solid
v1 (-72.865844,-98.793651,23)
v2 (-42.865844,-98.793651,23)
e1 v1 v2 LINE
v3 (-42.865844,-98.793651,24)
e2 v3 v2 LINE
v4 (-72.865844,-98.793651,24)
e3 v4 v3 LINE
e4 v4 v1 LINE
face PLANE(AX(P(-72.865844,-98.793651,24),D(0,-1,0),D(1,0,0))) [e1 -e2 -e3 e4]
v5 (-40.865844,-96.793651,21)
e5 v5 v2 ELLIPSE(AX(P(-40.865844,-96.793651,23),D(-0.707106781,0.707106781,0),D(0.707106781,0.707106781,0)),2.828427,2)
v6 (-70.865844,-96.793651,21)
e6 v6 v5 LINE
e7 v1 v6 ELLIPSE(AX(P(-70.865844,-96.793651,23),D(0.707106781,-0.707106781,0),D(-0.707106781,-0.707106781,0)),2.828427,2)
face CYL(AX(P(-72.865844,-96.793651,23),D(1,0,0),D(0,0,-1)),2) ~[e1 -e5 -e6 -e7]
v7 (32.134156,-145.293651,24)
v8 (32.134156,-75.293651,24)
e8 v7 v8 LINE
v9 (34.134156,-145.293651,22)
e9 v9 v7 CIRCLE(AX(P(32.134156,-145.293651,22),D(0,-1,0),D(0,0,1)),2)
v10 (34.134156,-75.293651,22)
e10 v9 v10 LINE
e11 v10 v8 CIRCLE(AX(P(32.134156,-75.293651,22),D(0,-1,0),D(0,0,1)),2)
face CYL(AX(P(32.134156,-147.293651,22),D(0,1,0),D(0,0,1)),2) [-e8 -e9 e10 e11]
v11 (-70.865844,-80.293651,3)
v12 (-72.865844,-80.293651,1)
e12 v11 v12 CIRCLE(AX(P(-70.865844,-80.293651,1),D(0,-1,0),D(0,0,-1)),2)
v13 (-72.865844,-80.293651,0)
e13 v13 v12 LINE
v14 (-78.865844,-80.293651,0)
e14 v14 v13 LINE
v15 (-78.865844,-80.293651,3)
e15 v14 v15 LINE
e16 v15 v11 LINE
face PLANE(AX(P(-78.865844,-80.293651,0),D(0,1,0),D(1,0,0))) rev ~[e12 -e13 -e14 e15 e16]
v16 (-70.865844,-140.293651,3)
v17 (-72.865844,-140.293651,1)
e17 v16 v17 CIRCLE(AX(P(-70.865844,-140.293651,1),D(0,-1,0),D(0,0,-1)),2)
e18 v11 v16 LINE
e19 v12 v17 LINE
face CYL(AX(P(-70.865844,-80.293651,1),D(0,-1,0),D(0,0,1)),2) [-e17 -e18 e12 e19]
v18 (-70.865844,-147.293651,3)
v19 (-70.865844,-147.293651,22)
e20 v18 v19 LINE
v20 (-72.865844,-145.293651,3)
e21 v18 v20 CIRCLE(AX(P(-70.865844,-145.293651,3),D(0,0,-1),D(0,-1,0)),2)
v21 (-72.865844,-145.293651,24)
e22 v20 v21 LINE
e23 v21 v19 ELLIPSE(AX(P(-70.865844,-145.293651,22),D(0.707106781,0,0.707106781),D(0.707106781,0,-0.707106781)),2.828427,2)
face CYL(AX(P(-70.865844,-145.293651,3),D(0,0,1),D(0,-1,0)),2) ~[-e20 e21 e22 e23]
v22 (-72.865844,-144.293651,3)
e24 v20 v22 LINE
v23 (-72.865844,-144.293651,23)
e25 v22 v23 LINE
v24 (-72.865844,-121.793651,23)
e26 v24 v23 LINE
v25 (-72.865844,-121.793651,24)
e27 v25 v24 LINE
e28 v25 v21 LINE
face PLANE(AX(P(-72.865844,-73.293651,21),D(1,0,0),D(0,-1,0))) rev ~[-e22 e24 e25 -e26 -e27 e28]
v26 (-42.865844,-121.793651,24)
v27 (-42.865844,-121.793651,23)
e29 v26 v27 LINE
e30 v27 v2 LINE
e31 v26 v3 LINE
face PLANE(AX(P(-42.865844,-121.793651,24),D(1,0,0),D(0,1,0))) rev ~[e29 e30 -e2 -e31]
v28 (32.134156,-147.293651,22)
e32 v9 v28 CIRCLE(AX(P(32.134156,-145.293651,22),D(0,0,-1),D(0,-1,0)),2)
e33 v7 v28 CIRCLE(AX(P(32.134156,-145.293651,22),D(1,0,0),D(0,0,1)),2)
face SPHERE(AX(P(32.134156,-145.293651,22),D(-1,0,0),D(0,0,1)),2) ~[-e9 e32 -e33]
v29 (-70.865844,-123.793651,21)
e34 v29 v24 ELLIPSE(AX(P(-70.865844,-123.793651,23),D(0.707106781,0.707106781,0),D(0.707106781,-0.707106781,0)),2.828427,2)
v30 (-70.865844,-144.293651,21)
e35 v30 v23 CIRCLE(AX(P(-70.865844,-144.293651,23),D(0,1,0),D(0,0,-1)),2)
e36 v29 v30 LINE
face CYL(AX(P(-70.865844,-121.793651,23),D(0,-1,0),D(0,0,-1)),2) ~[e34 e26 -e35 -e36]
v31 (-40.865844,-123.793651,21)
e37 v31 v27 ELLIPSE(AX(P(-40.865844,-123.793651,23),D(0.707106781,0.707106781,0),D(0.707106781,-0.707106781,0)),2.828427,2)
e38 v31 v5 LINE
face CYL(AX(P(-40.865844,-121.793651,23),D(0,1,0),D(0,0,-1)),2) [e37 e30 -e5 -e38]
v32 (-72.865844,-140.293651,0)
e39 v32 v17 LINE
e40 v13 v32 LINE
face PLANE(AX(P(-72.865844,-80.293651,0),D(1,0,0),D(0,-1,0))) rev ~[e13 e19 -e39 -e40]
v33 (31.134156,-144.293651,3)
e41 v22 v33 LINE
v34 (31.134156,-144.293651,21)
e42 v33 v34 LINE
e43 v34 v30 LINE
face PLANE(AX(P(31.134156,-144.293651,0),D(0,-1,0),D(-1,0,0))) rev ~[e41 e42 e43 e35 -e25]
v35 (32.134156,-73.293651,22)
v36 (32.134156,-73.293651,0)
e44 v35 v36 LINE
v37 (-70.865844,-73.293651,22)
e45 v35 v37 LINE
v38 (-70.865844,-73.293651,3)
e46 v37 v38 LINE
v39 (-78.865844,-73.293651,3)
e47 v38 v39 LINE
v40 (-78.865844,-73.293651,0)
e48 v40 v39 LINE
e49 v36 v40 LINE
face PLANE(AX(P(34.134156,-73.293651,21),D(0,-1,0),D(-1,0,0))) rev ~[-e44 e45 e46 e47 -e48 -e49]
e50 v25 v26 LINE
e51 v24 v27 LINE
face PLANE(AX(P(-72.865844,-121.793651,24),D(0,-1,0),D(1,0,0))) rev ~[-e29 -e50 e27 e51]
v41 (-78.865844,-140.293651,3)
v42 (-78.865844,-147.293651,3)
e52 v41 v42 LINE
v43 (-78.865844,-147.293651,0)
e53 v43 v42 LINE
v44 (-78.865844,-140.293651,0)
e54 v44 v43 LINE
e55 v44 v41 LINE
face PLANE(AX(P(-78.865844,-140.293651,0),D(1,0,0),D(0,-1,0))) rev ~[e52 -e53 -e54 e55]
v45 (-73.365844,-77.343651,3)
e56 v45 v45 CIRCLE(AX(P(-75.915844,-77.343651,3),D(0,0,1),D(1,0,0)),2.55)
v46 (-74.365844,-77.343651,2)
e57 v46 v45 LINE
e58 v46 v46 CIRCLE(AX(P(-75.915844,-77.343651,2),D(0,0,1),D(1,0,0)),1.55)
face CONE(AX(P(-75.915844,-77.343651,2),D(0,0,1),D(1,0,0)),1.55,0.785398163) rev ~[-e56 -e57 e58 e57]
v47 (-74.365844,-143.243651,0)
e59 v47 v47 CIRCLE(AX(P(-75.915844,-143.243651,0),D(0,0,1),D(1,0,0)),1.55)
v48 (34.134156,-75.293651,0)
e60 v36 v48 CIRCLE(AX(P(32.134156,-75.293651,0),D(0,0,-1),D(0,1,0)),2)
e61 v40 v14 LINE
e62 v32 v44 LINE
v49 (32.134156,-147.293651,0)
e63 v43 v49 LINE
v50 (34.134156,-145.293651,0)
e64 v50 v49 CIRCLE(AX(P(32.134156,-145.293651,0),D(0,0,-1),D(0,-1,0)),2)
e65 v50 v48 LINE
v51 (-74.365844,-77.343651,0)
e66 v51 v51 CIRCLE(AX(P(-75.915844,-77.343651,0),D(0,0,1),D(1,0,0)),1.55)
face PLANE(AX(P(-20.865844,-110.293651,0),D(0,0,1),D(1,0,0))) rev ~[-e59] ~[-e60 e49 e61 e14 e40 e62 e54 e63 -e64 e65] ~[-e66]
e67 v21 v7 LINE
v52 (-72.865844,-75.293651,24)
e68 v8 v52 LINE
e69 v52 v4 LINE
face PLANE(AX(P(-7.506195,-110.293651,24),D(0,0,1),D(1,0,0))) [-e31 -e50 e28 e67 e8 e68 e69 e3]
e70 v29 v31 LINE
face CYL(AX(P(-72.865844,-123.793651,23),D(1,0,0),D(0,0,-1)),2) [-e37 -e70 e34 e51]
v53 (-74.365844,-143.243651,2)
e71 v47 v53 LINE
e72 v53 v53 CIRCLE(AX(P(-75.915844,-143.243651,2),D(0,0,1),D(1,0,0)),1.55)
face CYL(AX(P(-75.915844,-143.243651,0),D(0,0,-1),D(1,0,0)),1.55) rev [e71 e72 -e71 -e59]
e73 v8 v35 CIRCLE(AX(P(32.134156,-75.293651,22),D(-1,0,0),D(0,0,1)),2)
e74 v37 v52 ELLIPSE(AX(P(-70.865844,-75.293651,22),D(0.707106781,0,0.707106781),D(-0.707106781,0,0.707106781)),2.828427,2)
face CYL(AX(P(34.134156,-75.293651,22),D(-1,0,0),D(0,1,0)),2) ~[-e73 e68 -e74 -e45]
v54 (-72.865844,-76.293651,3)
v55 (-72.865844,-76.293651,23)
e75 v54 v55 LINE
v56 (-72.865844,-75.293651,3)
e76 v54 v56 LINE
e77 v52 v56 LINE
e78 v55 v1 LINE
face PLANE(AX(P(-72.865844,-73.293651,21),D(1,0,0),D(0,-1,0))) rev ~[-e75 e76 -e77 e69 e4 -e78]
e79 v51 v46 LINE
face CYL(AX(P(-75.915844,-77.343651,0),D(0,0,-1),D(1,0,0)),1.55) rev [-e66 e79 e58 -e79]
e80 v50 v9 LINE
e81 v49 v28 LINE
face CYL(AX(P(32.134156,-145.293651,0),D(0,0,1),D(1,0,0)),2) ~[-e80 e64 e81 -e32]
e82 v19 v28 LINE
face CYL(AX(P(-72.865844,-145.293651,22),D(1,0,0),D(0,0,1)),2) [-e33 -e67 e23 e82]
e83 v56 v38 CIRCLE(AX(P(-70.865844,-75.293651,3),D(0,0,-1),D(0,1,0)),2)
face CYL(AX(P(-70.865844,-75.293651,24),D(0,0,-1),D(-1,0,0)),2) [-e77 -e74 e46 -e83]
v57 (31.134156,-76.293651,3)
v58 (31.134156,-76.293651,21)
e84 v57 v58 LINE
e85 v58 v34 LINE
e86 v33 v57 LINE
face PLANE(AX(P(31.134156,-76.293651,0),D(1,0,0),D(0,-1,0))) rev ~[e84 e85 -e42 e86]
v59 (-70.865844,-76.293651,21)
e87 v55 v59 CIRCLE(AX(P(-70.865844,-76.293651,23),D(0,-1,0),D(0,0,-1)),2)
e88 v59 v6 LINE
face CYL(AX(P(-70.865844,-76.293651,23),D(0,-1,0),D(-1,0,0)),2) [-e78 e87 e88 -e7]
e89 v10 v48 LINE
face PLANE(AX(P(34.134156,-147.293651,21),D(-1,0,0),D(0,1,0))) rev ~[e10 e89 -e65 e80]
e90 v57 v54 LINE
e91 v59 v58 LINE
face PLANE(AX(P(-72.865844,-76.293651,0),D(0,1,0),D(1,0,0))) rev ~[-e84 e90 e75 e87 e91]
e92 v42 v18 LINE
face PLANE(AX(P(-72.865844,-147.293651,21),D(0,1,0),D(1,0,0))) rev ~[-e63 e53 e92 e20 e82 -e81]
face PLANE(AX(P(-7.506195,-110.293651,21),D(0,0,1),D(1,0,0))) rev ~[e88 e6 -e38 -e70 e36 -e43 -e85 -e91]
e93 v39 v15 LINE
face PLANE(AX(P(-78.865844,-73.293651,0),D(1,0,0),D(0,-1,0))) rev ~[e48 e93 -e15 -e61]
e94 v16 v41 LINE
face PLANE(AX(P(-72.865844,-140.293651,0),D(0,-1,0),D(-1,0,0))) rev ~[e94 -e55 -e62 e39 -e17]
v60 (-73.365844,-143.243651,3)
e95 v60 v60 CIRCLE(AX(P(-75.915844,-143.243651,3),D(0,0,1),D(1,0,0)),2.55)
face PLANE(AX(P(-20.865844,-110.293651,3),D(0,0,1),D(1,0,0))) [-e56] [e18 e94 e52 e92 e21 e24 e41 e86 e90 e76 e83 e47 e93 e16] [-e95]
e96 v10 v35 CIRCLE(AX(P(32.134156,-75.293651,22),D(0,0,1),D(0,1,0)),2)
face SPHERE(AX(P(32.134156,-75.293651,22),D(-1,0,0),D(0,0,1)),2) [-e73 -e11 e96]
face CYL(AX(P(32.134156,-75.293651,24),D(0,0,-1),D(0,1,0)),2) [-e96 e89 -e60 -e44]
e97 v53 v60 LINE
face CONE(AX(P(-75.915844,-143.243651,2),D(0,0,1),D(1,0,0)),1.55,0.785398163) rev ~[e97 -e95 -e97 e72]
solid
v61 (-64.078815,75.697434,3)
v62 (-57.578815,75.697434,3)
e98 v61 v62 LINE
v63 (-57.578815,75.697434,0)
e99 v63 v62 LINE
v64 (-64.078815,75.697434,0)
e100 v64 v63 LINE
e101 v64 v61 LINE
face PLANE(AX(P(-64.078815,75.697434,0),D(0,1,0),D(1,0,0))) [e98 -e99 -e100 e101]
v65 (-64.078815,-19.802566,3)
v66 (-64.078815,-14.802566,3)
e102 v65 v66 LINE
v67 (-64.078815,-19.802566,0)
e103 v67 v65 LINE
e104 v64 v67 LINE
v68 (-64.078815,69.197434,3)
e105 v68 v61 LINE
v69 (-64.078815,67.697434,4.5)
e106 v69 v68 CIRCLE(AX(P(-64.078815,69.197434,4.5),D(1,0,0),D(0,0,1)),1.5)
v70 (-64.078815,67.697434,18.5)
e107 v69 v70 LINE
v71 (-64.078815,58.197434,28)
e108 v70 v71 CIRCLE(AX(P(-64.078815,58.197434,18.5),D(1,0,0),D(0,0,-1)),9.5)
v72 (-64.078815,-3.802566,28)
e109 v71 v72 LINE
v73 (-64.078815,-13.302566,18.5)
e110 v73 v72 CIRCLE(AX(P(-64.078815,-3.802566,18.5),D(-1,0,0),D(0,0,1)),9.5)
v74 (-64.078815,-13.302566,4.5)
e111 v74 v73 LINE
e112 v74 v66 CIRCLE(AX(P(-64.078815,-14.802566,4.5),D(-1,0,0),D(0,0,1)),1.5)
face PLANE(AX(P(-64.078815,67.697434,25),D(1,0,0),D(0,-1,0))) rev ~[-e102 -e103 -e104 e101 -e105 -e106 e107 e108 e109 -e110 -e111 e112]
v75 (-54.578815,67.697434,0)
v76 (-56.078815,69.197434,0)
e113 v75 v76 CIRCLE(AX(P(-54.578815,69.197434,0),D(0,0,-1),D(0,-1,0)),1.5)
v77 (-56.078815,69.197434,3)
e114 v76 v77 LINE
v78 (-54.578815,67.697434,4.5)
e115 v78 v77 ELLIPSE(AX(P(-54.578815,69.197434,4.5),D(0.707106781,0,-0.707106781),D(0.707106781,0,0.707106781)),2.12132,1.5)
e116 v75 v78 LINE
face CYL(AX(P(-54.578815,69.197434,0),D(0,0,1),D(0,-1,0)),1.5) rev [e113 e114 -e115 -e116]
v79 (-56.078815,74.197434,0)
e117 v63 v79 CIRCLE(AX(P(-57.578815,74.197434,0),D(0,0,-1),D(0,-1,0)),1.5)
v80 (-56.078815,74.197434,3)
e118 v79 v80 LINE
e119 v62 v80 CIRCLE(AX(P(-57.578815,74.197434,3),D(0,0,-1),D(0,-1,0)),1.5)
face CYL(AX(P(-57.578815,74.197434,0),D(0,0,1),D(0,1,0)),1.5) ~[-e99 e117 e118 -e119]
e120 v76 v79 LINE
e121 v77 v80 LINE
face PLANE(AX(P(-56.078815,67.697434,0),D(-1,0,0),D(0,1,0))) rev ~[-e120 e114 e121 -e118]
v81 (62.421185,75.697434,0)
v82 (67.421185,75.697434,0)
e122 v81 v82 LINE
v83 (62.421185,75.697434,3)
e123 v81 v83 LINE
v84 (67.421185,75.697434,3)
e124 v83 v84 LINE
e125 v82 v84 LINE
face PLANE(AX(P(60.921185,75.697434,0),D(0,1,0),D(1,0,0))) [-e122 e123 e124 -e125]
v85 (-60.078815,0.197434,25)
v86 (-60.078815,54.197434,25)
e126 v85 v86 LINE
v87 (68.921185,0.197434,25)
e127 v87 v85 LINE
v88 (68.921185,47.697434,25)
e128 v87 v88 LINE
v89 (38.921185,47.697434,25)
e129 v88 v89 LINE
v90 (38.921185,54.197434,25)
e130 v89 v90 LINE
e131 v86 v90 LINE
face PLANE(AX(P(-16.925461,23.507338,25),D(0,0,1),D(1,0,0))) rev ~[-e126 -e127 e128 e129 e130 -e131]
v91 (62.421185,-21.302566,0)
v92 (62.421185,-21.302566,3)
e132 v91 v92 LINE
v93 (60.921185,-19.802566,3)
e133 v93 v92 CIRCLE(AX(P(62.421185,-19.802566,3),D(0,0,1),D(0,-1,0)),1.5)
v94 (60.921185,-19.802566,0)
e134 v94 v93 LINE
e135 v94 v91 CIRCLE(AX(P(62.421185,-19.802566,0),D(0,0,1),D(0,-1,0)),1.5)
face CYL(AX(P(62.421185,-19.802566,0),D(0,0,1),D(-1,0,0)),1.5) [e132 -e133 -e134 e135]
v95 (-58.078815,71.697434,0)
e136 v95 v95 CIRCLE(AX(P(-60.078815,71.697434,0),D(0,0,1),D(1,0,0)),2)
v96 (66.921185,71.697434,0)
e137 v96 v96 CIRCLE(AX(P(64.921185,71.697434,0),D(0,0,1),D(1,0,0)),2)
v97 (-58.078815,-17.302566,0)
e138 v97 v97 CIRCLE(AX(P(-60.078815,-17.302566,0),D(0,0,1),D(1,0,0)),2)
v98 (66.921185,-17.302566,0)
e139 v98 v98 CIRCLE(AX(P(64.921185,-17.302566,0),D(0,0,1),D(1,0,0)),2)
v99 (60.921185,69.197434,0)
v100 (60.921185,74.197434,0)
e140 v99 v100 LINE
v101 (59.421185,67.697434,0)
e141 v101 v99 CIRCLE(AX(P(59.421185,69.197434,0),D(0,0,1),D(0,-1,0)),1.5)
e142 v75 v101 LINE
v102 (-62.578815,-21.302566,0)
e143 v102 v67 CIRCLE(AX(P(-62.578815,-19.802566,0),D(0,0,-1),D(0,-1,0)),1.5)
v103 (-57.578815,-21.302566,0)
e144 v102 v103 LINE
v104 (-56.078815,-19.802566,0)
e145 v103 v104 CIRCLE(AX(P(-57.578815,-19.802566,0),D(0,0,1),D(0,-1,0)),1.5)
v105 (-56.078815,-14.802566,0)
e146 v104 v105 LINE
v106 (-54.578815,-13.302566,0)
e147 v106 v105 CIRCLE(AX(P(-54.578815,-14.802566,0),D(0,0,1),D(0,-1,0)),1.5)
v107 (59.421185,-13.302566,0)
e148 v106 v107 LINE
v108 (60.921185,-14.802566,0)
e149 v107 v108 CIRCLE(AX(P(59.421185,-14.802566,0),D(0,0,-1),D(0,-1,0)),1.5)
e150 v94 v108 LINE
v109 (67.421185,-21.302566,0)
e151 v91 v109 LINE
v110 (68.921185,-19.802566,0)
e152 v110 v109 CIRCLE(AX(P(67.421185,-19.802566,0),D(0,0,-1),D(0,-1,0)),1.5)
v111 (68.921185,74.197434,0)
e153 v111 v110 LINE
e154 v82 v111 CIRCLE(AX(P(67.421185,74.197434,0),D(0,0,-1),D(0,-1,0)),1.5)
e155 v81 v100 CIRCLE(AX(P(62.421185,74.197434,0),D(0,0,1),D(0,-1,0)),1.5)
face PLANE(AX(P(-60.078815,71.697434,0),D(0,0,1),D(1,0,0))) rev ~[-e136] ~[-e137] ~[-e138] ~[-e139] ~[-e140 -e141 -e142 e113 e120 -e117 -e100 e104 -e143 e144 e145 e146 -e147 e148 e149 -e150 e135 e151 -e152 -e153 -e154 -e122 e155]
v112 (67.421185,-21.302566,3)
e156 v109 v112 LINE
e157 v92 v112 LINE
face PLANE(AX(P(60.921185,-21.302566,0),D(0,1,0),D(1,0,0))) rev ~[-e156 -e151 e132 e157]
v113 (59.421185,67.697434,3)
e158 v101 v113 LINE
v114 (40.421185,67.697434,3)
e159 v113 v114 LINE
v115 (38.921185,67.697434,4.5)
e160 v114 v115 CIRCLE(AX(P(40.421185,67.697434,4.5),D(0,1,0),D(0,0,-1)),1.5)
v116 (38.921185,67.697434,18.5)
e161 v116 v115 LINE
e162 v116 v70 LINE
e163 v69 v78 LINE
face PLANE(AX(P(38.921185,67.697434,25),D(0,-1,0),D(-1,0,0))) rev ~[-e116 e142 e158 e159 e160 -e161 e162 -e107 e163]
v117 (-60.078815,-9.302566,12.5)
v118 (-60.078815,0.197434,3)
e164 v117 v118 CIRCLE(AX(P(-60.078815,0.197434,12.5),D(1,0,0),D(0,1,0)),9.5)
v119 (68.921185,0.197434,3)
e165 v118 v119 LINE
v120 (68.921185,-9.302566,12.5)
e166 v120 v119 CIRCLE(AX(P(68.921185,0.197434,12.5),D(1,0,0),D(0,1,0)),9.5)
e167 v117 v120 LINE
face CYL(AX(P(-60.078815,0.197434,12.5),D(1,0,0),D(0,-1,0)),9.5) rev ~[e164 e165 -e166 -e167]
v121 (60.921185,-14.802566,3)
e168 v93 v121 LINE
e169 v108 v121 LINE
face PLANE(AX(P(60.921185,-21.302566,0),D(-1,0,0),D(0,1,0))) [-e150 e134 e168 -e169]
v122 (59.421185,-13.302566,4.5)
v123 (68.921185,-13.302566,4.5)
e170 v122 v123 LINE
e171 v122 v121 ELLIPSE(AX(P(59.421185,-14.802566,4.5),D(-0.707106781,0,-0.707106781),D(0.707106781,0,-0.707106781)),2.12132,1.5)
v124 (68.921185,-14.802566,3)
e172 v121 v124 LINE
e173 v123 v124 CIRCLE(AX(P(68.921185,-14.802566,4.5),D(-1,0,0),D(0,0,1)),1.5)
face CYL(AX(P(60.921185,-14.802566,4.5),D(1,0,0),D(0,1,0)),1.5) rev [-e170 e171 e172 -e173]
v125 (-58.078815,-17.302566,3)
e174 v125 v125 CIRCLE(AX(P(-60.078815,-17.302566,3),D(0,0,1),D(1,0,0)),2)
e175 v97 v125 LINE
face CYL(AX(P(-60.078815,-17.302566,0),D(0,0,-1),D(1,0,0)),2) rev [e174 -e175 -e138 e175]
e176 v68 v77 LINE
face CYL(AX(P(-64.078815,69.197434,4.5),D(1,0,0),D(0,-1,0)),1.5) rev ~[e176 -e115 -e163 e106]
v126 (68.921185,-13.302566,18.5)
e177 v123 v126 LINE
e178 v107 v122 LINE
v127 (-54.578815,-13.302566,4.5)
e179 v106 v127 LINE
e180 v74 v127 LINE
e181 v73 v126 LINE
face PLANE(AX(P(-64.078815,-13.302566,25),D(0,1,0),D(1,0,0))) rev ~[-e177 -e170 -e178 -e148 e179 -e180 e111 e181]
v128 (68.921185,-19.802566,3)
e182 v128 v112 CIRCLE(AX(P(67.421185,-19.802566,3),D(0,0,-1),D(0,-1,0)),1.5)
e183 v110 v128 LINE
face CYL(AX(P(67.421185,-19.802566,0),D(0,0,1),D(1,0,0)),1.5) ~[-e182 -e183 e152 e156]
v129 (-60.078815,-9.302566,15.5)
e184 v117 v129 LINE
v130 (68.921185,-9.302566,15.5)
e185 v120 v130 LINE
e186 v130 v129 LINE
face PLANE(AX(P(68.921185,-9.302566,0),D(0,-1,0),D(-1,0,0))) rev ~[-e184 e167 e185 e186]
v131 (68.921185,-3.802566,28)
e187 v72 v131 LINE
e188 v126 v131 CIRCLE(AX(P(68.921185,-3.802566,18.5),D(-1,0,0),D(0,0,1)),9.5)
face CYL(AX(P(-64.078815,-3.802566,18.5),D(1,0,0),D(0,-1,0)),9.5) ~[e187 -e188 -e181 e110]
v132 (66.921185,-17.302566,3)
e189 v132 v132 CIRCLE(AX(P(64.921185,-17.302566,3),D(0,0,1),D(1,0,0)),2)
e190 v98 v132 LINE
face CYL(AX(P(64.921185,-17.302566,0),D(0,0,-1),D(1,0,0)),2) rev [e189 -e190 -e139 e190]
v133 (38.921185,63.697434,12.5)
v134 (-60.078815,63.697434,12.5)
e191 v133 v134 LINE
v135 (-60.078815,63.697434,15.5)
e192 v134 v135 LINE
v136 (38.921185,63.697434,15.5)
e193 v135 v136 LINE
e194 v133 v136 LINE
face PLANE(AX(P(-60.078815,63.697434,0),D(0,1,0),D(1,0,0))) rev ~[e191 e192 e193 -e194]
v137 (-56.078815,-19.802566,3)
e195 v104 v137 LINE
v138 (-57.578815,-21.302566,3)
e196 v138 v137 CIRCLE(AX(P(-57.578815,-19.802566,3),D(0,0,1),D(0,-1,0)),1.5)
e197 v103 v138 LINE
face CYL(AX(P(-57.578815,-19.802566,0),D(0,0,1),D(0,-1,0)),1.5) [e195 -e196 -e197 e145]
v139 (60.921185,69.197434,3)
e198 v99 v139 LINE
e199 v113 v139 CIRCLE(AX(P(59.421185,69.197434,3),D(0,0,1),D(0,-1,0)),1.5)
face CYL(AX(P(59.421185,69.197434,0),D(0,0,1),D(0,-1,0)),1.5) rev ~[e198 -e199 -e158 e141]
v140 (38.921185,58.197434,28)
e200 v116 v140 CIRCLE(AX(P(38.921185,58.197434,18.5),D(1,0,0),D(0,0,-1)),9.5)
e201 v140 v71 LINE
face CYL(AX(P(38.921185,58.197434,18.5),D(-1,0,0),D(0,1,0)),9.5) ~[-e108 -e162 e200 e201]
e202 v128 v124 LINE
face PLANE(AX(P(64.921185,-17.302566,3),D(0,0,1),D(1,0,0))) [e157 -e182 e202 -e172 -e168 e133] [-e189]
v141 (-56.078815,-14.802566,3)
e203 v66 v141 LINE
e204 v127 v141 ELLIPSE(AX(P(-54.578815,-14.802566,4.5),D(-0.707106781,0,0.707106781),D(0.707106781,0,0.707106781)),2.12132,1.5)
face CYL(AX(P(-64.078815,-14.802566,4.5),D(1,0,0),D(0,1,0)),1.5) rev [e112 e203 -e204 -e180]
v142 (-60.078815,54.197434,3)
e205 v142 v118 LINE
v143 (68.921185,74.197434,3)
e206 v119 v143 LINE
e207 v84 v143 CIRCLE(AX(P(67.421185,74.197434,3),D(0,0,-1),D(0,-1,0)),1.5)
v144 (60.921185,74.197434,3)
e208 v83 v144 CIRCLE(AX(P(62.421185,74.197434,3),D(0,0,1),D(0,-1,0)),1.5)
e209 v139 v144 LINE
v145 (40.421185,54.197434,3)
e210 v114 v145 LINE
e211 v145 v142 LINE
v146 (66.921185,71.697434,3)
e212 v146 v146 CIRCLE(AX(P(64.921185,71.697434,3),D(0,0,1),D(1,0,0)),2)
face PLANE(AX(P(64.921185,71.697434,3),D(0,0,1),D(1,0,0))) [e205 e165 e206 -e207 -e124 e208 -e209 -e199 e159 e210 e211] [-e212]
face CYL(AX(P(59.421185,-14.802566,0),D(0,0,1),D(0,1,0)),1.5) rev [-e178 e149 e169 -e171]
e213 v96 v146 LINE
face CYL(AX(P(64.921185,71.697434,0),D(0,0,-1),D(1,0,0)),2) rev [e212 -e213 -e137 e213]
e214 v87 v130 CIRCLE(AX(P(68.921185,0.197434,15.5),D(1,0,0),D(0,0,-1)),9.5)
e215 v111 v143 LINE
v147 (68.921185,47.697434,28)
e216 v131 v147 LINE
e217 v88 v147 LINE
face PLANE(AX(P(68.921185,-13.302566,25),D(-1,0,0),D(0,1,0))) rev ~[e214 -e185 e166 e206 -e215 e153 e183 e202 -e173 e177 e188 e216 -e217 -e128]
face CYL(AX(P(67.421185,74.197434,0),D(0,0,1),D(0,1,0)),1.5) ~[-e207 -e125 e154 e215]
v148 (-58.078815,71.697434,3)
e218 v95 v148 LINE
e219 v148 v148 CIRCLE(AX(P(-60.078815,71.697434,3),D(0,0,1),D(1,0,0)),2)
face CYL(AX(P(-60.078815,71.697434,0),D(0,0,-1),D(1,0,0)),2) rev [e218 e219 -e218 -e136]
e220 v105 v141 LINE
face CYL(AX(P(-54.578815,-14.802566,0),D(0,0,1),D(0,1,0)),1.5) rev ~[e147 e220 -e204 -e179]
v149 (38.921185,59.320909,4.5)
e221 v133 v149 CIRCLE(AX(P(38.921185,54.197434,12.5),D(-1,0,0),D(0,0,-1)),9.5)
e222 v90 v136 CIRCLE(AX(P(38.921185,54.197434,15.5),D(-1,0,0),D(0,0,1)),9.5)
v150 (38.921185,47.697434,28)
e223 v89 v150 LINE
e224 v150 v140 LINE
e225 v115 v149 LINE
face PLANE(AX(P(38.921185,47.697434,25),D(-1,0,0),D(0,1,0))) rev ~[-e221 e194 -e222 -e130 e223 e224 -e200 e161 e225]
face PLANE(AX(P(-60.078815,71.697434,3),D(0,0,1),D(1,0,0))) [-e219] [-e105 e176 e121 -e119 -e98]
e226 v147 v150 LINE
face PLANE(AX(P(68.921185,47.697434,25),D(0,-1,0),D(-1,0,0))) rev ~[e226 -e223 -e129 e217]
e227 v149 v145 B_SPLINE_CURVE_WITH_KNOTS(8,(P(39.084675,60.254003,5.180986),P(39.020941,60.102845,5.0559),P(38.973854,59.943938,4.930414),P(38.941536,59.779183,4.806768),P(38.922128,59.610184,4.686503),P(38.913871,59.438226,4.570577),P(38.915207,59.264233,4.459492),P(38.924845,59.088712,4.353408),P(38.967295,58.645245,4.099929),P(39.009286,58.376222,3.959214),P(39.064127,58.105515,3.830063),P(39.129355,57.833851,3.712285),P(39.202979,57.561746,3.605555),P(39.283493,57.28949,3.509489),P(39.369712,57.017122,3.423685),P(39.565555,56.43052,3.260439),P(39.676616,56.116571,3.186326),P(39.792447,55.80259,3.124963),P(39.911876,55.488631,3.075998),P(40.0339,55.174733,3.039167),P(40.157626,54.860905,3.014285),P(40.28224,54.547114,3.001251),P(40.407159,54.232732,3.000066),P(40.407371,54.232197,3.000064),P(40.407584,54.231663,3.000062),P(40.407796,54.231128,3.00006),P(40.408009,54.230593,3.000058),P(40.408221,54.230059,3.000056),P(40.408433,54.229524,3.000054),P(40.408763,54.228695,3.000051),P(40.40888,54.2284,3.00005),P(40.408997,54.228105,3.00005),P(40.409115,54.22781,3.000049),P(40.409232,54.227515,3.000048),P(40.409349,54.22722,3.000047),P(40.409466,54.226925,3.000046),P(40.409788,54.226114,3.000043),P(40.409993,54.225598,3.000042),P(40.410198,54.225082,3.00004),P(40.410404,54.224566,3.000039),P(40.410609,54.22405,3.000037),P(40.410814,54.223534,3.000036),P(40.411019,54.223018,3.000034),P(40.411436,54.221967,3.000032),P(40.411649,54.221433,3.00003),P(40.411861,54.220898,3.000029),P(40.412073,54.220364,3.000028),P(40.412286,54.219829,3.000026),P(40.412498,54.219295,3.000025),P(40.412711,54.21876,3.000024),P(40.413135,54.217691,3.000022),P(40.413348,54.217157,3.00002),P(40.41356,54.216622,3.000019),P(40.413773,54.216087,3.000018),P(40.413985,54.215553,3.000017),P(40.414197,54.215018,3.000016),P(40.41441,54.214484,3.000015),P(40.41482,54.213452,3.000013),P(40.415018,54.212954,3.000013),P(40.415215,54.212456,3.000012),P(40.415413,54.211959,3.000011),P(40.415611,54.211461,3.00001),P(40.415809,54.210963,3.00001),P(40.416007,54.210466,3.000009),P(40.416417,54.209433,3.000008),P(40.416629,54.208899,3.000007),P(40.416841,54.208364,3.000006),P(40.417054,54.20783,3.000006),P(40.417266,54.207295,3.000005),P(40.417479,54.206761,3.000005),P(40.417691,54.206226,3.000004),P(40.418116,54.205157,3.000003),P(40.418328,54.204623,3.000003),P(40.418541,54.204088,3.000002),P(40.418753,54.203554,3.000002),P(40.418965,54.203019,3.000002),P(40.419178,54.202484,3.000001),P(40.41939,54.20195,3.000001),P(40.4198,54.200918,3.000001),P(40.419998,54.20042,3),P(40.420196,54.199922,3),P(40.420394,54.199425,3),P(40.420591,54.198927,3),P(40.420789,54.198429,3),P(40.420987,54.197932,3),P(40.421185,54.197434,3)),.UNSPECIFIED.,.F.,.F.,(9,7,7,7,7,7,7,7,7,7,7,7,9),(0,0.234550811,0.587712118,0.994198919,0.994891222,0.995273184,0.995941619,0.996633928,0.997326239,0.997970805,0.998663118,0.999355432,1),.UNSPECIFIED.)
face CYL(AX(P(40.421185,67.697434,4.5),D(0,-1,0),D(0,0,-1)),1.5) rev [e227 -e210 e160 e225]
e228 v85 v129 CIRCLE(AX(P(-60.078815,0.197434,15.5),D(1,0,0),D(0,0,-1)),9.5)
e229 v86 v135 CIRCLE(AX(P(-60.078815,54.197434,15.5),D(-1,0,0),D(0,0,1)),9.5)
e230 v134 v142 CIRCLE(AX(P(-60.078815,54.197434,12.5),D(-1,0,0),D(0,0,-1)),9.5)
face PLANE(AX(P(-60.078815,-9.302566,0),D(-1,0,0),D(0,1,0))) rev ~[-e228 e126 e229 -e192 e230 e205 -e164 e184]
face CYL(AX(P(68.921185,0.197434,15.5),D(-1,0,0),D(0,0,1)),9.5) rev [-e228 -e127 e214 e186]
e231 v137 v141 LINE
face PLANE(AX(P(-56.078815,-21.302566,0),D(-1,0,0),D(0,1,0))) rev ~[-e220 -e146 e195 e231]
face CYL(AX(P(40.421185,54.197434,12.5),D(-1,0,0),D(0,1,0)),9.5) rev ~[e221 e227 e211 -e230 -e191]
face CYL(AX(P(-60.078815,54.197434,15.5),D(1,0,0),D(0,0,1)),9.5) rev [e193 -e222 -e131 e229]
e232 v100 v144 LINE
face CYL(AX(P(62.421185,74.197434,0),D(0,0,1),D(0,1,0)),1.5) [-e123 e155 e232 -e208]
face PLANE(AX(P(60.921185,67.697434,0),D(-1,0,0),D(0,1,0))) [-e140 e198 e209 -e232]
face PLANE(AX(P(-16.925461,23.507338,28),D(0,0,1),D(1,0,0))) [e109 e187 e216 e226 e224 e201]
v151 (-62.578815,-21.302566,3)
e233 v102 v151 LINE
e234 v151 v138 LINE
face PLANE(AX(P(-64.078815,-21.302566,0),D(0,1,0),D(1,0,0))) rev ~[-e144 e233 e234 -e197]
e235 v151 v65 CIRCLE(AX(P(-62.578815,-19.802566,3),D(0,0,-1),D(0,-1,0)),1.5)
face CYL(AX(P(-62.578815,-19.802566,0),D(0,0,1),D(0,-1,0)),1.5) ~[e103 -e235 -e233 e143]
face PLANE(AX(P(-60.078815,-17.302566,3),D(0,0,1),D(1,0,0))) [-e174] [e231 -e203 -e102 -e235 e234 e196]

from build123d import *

# Parameters (mm, degrees)
F1_DEPTH  = 25
F0_W      = 8
F0_H      = 8
F0_R      = 2
F0_W_2    = 26
F0_H_2    = 16
F0_W_3    = 4
F0_H_3    = 57
F2_DEPTH  = 3
F3_START  = 25
F3_DEPTH  = 3
F4_R      = 1.5
F5_R      = 9.5
F6_R      = 1.55
F7_DEPTH  = 3
F8_DEPTH  = 21
F9_START  = 21
F9_DEPTH  = 3
F10_W     = 30
F10_H     = 23
F11_DEPTH = 3
F12_R     = 2
F13_SIZE  = 1


with BuildPart() as f1:
    # F0 (on Top) → F1 (new body)
    with BuildSketch(Plane.XY):
        Polygon((-60.0788152814, -9.3025659323), (-60.0788152814, 63.6974340677), (38.9211847186, 63.6974340677), (38.9211847186, 67.6974340677), (-56.0788152814, 67.6974340677), (-64.0788152814, 67.6974340677), (-64.0788152814, -13.3025659323), (-56.0788152814, -13.3025659323), (60.9211847186, -13.3025659323), (68.9211847186, -13.3025659323), (68.9211847186, -9.3025659323), (64.9211847186, -9.3025659323), align=None)
    extrude(amount=F1_DEPTH)

    # F0 (on Top) → F2 (join)
    with BuildSketch(Plane.XY):
        with Locations((-60.0788152814, 71.6974340677)):
            Rectangle(F0_W, F0_H)
        with Locations((-60.0788152814, 71.6974340677)):
            Circle(F0_R, mode=Mode.SUBTRACT)
        with Locations((64.9211847186, 71.6974340677)):
            Rectangle(F0_W, F0_H)
        with Locations((64.9211847186, 71.6974340677)):
            Circle(F0_R, mode=Mode.SUBTRACT)
        Polygon((38.9211847186, 67.6974340677), (38.9211847186, 63.6974340677), (64.9211847186, 63.6974340677), (68.9211847186, 63.6974340677), (68.9211847186, 67.6974340677), (60.9211847186, 67.6974340677), align=None)
        with Locations((51.9211847186, 55.6974340677)):
            Rectangle(F0_W_2, F0_H_2)
        with Locations((66.9211847186, 55.6974340677)):
            Rectangle(F0_W_3, F0_H_2)
        with Locations((66.9211847186, 19.1974340677)):
            Rectangle(F0_W_3, F0_H_3)
        Polygon((38.9211847186, 63.6974340677), (-60.0788152814, 63.6974340677), (-60.0788152814, -9.3025659323), (64.9211847186, -9.3025659323), (64.9211847186, 47.6974340677), (38.9211847186, 47.6974340677), align=None)
        with Locations((64.9211847186, -17.3025659323)):
            Rectangle(F0_W, F0_H)
        with Locations((64.9211847186, -17.3025659323)):
            Circle(F0_R, mode=Mode.SUBTRACT)
        with Locations((-60.0788152814, -17.3025659323)):
            Rectangle(F0_W, F0_H)
        with Locations((-60.0788152814, -17.3025659323)):
            Circle(F0_R, mode=Mode.SUBTRACT)
    extrude(amount=F2_DEPTH)

    # F0 (on Top) → F3 (join)
    with BuildSketch(Plane.XY.offset(F3_START)):
        Polygon((-60.0788152814, -9.3025659323), (-60.0788152814, 63.6974340677), (38.9211847186, 63.6974340677), (38.9211847186, 67.6974340677), (-56.0788152814, 67.6974340677), (-64.0788152814, 67.6974340677), (-64.0788152814, -13.3025659323), (-56.0788152814, -13.3025659323), (60.9211847186, -13.3025659323), (68.9211847186, -13.3025659323), (68.9211847186, -9.3025659323), (64.9211847186, -9.3025659323), align=None)
        Polygon((38.9211847186, 63.6974340677), (-60.0788152814, 63.6974340677), (-60.0788152814, -9.3025659323), (64.9211847186, -9.3025659323), (64.9211847186, 47.6974340677), (38.9211847186, 47.6974340677), align=None)
        with Locations((66.9211847186, 19.1974340677)):
            Rectangle(F0_W_3, F0_H_3)
    extrude(amount=F3_DEPTH)

    # F4
    f4_edges = [f1.edges().sort_by_distance(p)[0] for p in [
        (64.921185, -13.302566, 3),
        (-60.078815, -13.302566, 3),
        (-60.078815, 67.697434, 3),
        (60.921185, 67.697434, 1.5),
        (-56.078815, 67.697434, 1.5),
        (-56.078815, -13.302566, 1.5),
        (60.921185, -13.302566, 1.5),
        (38.921185, 65.697434, 3),
        (-56.078815, 75.697434, 1.5),
        (-56.078815, -21.302566, 1.5),
        (-64.078815, -21.302566, 1.5),
        (60.921185, -21.302566, 1.5),
        (68.921185, -21.302566, 1.5),
        (68.921185, 75.697434, 1.5),
        (60.921185, 75.697434, 1.5),
    ]]
    fillet(f4_edges, radius=F4_R)

    # F5
    f5_edges = [f1.edges().sort_by_distance(p)[0] for p in [
        (-10.578815, 63.697434, 25),
        (-10.578815, 63.697434, 3),
        (4.421185, -9.302566, 3),
        (4.421185, -9.302566, 25),
        (2.421185, -13.302566, 28),
        (-12.578815, 67.697434, 28),
    ]]
    fillet(f5_edges, radius=F5_R)


with BuildPart() as f7:
    # F6 (on Top) → F7 (new body)
    with BuildSketch(Plane.XY):
        Polygon((31.1341558844, -76.2936508735), (-72.8658441156, -76.2936508735), (-72.8658441156, -80.2936508735), (-72.8658441156, -140.2936508735), (-72.8658441156, -144.2936508735), (31.1341558844, -144.2936508735), align=None)
        Polygon((-72.8658441156, -73.2936508735), (-72.8658441156, -76.2936508735), (31.1341558844, -76.2936508735), (31.1341558844, -144.2936508735), (-72.8658441156, -144.2936508735), (-72.8658441156, -147.2936508735), (34.1341558844, -147.2936508735), (34.1341558844, -73.2936508735), align=None)
        Polygon((-72.8658441156, -80.2936508735), (-72.8658441156, -76.2936508735), (-72.8658441156, -73.2936508735), (-78.8658441156, -73.2936508735), (-78.8658441156, -80.2936508735), align=None)
        with Locations((-75.9158441156, -77.3436508735)):
            Circle(F6_R, mode=Mode.SUBTRACT)
        Polygon((-72.8658441156, -144.2936508735), (-72.8658441156, -140.2936508735), (-78.8658441156, -140.2936508735), (-78.8658441156, -147.2936508735), (-72.8658441156, -147.2936508735), align=None)
        with Locations((-75.9158441156, -143.2436508735)):
            Circle(F6_R, mode=Mode.SUBTRACT)
    extrude(amount=F7_DEPTH)

    # F6 (on Top) → F8 (join)
    with BuildSketch(Plane.XY):
        Polygon((-72.8658441156, -73.2936508735), (-72.8658441156, -76.2936508735), (31.1341558844, -76.2936508735), (31.1341558844, -144.2936508735), (-72.8658441156, -144.2936508735), (-72.8658441156, -147.2936508735), (34.1341558844, -147.2936508735), (34.1341558844, -73.2936508735), align=None)
    extrude(amount=F8_DEPTH)

    # F6 (on Top) → F9 (join)
    with BuildSketch(Plane.XY.offset(F9_START)):
        Polygon((-72.8658441156, -73.2936508735), (-72.8658441156, -76.2936508735), (31.1341558844, -76.2936508735), (31.1341558844, -144.2936508735), (-72.8658441156, -144.2936508735), (-72.8658441156, -147.2936508735), (34.1341558844, -147.2936508735), (34.1341558844, -73.2936508735), align=None)
        Polygon((31.1341558844, -76.2936508735), (-72.8658441156, -76.2936508735), (-72.8658441156, -80.2936508735), (-72.8658441156, -140.2936508735), (-72.8658441156, -144.2936508735), (31.1341558844, -144.2936508735), align=None)
    extrude(amount=F9_DEPTH)

    # F10 (on face) → F11 (cut)
    with BuildSketch(Plane.XY.offset(24)):
        with Locations((-57.8658441156, -110.2936508735)):
            Rectangle(F10_W, F10_H)
    extrude(amount=-F11_DEPTH, mode=Mode.SUBTRACT)

    # F12
    f12_edges = [f7.edges().sort_by_distance(p)[0] for p in [
        (-19.365844, -73.293651, 24),
        (-19.365844, -147.293651, 24),
        (34.134156, -110.293651, 24),
        (34.134156, -147.293651, 12),
        (34.134156, -73.293651, 12),
        (-72.865844, -147.293651, 13.5),
        (-72.865844, -73.293651, 13.5),
        (-72.865844, -133.043651, 21),
        (-72.865844, -87.543651, 21),
        (-57.865844, -98.793651, 21),
        (-57.865844, -121.793651, 21),
        (-42.865844, -110.293651, 21),
        (-72.865844, -110.293651, 3),
    ]]
    fillet(f12_edges, radius=F12_R)

    # F13
    f13_edges = [f7.edges().sort_by_distance(p)[0] for p in [
        (-77.465844, -77.343651, 3),
        (-77.465844, -143.243651, 3),
    ]]
    chamfer(f13_edges, length=F13_SIZE)


solid = Compound([f1.part, f7.part])
